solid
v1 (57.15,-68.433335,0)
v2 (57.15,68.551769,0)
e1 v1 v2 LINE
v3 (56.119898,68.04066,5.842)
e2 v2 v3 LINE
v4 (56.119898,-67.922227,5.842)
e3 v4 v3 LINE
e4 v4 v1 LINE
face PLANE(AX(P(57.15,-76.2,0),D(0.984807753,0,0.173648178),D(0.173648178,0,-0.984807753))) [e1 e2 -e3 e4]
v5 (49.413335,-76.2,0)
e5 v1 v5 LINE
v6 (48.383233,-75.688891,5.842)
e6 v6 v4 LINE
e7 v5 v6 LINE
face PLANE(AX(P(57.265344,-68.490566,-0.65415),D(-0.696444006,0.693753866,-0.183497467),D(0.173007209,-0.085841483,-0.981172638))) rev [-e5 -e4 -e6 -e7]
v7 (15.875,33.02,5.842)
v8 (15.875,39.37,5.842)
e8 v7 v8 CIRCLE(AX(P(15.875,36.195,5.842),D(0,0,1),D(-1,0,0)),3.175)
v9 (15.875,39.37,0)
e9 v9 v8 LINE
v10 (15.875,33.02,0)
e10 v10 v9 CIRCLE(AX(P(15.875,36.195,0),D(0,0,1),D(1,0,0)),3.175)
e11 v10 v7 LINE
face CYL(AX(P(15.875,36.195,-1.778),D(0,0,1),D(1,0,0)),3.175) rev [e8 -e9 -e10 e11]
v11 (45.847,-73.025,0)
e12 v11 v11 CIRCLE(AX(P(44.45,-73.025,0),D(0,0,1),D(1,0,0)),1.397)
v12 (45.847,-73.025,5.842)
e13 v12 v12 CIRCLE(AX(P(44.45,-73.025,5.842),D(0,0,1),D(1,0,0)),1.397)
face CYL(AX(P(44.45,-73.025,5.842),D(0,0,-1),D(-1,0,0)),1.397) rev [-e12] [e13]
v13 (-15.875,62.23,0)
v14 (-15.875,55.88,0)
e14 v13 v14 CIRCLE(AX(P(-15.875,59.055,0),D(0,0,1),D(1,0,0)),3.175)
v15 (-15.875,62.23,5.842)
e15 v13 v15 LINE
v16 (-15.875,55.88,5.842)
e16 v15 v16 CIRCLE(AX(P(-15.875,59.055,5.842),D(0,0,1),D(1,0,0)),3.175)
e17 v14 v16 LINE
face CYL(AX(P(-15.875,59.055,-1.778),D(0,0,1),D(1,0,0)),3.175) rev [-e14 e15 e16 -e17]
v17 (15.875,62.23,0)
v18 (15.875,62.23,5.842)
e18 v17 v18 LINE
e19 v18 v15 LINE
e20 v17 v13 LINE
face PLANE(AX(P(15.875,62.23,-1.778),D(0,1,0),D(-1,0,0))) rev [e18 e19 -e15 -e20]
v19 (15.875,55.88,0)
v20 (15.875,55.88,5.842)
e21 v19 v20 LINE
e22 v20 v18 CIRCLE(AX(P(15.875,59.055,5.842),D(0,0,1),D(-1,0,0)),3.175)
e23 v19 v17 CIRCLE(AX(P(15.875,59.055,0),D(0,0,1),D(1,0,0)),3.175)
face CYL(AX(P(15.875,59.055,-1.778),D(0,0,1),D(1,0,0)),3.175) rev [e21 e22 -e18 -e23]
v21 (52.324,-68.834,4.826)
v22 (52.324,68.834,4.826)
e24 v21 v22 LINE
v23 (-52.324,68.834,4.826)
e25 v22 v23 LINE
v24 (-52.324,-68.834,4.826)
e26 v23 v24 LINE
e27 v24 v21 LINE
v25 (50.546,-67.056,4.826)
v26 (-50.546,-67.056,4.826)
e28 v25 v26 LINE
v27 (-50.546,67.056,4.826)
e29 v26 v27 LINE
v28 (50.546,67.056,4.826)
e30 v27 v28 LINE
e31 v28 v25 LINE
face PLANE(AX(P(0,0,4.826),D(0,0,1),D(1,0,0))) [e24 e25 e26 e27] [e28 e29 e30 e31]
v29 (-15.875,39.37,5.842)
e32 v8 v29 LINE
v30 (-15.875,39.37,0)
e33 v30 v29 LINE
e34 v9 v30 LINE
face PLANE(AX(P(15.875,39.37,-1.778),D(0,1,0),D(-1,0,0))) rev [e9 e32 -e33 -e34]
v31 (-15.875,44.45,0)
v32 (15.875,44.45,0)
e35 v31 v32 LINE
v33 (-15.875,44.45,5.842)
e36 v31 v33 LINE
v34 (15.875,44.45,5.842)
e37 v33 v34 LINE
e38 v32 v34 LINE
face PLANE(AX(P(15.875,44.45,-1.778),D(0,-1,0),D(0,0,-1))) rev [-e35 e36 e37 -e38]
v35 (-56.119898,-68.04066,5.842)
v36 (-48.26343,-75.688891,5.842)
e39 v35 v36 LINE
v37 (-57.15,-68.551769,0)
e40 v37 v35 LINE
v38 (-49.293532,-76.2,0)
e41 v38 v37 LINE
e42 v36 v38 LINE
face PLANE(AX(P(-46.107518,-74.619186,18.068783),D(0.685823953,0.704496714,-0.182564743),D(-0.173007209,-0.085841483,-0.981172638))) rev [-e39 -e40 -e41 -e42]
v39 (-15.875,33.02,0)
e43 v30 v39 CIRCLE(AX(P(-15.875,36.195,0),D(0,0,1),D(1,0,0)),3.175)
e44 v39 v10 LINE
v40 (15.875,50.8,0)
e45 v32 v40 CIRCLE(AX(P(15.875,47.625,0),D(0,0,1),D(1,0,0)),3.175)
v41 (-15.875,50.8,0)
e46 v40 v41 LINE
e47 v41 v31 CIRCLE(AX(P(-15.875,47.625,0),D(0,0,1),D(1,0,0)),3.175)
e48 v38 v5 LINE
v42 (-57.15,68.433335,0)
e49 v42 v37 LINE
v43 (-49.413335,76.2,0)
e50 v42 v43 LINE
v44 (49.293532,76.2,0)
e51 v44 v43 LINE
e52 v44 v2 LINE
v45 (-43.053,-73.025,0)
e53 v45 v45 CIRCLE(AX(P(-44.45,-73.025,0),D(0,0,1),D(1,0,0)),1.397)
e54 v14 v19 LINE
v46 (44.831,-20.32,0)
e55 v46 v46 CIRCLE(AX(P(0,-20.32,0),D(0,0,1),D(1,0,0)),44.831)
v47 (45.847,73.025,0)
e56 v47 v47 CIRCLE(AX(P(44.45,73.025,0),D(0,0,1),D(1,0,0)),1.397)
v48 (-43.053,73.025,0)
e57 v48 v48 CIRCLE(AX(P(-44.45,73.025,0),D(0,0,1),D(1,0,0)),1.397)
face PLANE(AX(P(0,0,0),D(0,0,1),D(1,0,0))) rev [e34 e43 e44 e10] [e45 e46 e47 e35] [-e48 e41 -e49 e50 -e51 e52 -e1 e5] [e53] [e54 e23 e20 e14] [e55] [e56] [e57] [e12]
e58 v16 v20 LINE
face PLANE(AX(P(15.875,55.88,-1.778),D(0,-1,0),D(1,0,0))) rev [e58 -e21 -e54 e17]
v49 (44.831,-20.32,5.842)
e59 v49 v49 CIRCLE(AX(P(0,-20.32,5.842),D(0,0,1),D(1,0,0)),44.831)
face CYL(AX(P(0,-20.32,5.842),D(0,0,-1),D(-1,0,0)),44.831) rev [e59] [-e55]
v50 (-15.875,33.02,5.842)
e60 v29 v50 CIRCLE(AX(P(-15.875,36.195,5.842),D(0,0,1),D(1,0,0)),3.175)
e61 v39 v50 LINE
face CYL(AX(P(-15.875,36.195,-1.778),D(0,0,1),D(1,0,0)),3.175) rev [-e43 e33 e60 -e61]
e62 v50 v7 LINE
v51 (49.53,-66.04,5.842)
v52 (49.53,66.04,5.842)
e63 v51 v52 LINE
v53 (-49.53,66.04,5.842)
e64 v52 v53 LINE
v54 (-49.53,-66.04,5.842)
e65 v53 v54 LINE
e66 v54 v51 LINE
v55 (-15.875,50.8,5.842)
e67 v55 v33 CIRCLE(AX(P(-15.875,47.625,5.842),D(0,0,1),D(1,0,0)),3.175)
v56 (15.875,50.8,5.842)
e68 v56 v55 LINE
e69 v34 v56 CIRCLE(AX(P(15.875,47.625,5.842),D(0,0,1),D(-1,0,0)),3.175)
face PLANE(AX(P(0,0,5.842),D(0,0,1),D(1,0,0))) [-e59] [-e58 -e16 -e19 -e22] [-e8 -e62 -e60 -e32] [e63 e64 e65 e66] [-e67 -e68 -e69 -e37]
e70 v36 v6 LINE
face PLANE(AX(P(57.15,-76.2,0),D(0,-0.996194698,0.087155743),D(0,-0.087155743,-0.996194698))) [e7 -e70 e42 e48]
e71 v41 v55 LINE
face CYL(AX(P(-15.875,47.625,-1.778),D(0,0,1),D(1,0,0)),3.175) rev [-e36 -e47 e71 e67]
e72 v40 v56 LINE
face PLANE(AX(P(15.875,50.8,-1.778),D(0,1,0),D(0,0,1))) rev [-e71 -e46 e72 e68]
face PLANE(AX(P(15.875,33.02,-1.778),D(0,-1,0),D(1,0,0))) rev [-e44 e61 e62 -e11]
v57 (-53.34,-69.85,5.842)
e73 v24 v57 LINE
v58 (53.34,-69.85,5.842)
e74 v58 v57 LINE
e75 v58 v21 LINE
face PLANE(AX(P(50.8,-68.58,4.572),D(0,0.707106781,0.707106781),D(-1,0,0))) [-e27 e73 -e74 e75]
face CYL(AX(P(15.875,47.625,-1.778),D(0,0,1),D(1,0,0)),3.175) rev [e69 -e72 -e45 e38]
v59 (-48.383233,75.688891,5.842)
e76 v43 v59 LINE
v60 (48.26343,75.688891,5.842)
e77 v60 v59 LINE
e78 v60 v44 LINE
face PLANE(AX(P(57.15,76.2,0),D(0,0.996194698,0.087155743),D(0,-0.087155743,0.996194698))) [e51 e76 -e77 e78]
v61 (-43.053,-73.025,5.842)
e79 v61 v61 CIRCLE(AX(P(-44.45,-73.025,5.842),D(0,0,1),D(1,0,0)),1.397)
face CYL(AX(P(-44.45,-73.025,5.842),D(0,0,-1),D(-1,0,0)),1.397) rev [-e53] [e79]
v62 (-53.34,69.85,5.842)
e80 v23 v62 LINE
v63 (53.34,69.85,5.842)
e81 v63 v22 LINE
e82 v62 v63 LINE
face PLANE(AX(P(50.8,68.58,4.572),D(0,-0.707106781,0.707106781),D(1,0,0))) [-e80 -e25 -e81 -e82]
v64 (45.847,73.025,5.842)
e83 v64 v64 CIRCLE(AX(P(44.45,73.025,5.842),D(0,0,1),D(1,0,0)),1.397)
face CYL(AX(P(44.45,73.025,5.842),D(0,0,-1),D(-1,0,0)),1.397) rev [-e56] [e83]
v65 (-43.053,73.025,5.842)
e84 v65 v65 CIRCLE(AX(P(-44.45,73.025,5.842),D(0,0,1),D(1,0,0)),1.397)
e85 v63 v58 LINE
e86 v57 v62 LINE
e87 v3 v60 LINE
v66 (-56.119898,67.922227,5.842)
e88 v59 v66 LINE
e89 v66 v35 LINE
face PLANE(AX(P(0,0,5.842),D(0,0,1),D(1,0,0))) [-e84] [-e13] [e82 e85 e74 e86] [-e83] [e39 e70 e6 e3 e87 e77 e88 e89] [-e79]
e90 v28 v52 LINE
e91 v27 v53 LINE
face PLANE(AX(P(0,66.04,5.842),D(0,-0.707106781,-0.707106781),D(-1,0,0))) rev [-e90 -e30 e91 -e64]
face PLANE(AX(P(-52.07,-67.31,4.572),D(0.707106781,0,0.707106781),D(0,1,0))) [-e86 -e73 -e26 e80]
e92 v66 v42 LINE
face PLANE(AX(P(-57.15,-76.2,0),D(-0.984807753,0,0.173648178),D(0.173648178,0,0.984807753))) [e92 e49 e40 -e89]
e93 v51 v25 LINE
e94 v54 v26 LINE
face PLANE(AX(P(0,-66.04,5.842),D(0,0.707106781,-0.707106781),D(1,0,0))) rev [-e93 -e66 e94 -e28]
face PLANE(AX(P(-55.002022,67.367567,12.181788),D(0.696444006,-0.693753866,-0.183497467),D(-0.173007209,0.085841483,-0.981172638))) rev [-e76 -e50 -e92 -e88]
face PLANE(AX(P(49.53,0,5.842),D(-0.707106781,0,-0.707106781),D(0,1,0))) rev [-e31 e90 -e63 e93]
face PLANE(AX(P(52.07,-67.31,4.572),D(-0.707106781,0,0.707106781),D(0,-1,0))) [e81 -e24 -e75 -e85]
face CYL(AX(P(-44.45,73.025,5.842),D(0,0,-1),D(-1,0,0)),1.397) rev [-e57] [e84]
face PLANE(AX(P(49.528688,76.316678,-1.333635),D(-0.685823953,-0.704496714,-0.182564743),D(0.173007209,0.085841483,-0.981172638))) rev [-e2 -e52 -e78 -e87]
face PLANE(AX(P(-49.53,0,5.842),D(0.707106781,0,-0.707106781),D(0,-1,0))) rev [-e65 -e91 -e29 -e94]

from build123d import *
from OCP.BRepFilletAPI import BRepFilletAPI_MakeChamfer

# Parameters (mm, degrees)
SKETCH1_W               = 114.3
SKETCH1_H               = 152.4
SKETCH1_R               = 44.831
SKETCH1_R_2             = 1.397
BOSS_EXTRUDE1_DEPTH     = 5.842
DRAFT1_ANGLE            = -5
DRAFT2_ANGLE            = -10
SKETCH2_W               = 104.14
SKETCH2_H               = 137.16
SKETCH2_W_2             = 101.6
SKETCH2_H_2             = 134.62
CUT_EXTRUDE_THIN1_DEPTH = 1.016
CHAMFER2_SIZE           = 7.62
CHAMFER2_SIZE2          = 7.737996461
CUT_EXTRUDE1_DEPTH      = 7.62


with BuildPart() as part:
    # Sketch1 → Boss-Extrude1 (new body)
    with BuildSketch(Plane.XY):
        Rectangle(SKETCH1_W, SKETCH1_H)
        with Locations((0, -20.32)):
            Circle(SKETCH1_R, mode=Mode.SUBTRACT)
        with Locations((-44.45, 73.025)):
            Circle(SKETCH1_R_2, mode=Mode.SUBTRACT)
        with Locations((44.45, 73.025)):
            Circle(SKETCH1_R_2, mode=Mode.SUBTRACT)
        with Locations((44.45, -73.025)):
            Circle(SKETCH1_R_2, mode=Mode.SUBTRACT)
        with Locations((-44.45, -73.025)):
            Circle(SKETCH1_R_2, mode=Mode.SUBTRACT)
    extrude(amount=BOSS_EXTRUDE1_DEPTH)

    # Draft1
    draft1_faces = [part.faces().sort_by_distance(p)[0] for p in [
        (0, 76.2, 2.921),
        (0, -76.2, 2.921),
    ]]
    draft(draft1_faces, Plane(origin=(0, 0, 0), x_dir=(-1, 0, 0), z_dir=(0, 0, -1)), DRAFT1_ANGLE)

    # Draft2
    draft2_faces = [part.faces().sort_by_distance(p)[0] for p in [
        (57.15, 0, 2.917723595),
        (-57.15, 0, 2.917723595),
    ]]
    draft(draft2_faces, Plane(origin=(0, 0, 0), x_dir=(-1, 0, 0), z_dir=(0, 0, -1)), DRAFT2_ANGLE)

    # Sketch2 → Cut-Extrude-Thin1 (cut)
    with BuildSketch(Plane.XY.offset(5.842)):
        Rectangle(SKETCH2_W, SKETCH2_H)
        Rectangle(SKETCH2_W_2, SKETCH2_H_2, mode=Mode.SUBTRACT)
    extrude(amount=-CUT_EXTRUDE_THIN1_DEPTH, mode=Mode.SUBTRACT)

    # Chamfer1
    # the kernel refuses this chamfer: 1.27 mm, written as the material it takes off along each edge
    with BuildSketch(Plane(origin=(50.8, 67.31, 5.842), x_dir=(-0.9996219169112968, 0, 0.02749587661058659), z_dir=(0, -1, 0))) as chamfer1_piece_1_section:
        with BuildLine():
            Line((1.306414958, 0), (-0.071814887, 1.304439598))
            Line((-0.071814887, 1.304439598), (-0.097205283, 1.303741203))
            ThreePointArc((-0.097205283, 1.303741203), (-0.043344118, 0.652015244), (-0.025390397, -0.000698395))
            Line((-0.025390397, -0.000698395), (0.000698395, -0.025390397))
            ThreePointArc((0.000698395, -0.025390397), (0.653412034, -0.007436675), (1.307113353, -0.025390397))
            Line((1.307113353, -0.025390397), (1.306414958, 0))
        make_face()
    chamfer1_piece_1 = extrude(amount=134.62, mode=Mode.PRIVATE)
    chamfer1_piece_1 = split(chamfer1_piece_1, bisect_by=Plane(origin=(50.360937616, 0, 4.826), z_dir=(0, 0, 1)), keep=Keep.TOP, mode=Mode.PRIVATE)
    add(chamfer1_piece_1, mode=Mode.SUBTRACT)
    with BuildSketch(Plane(origin=(50.8, -67.31, 5.842), x_dir=(0, 0.9996219169112968, 0.02749587661058659), z_dir=(-1, 0, 0))) as chamfer1_piece_2_section:
        with BuildLine():
            Line((1.306414958, 0), (-0.071814887, 1.304439598))
            Line((-0.071814887, 1.304439598), (-0.097205283, 1.303741203))
            ThreePointArc((-0.097205283, 1.303741203), (-0.043344118, 0.652015244), (-0.025390397, -0.000698395))
            Line((-0.025390397, -0.000698395), (0.000698395, -0.025390397))
            ThreePointArc((0.000698395, -0.025390397), (0.653412034, -0.007436675), (1.307113353, -0.025390397))
            Line((1.307113353, -0.025390397), (1.306414958, 0))
        make_face()
    chamfer1_piece_2 = extrude(amount=101.6, mode=Mode.PRIVATE)
    chamfer1_piece_2 = split(chamfer1_piece_2, bisect_by=Plane(origin=(0, -66.870937616, 4.826), z_dir=(0, 0, 1)), keep=Keep.TOP, mode=Mode.PRIVATE)
    add(chamfer1_piece_2, mode=Mode.SUBTRACT)
    with BuildSketch(Plane(origin=(-50.8, -67.31, 5.842), x_dir=(0.9996219169112968, 0, 0.02749587661058659), z_dir=(0, 1, 0))) as chamfer1_piece_3_section:
        with BuildLine():
            Line((1.306414958, 0), (-0.071814887, 1.304439598))
            Line((-0.071814887, 1.304439598), (-0.097205283, 1.303741203))
            ThreePointArc((-0.097205283, 1.303741203), (-0.043344118, 0.652015244), (-0.025390397, -0.000698395))
            Line((-0.025390397, -0.000698395), (0.000698395, -0.025390397))
            ThreePointArc((0.000698395, -0.025390397), (0.653412034, -0.007436675), (1.307113353, -0.025390397))
            Line((1.307113353, -0.025390397), (1.306414958, 0))
        make_face()
    chamfer1_piece_3 = extrude(amount=134.62, mode=Mode.PRIVATE)
    chamfer1_piece_3 = split(chamfer1_piece_3, bisect_by=Plane(origin=(-50.360937616, 0, 4.826), z_dir=(0, 0, 1)), keep=Keep.TOP, mode=Mode.PRIVATE)
    add(chamfer1_piece_3, mode=Mode.SUBTRACT)
    with BuildSketch(Plane(origin=(-50.8, 67.31, 5.842), x_dir=(0, -0.9996219169112968, 0.02749587661058659), z_dir=(1, 0, 0))) as chamfer1_piece_4_section:
        with BuildLine():
            Line((1.306414958, 0), (-0.071814887, 1.304439598))
            Line((-0.071814887, 1.304439598), (-0.097205283, 1.303741203))
            ThreePointArc((-0.097205283, 1.303741203), (-0.043344118, 0.652015244), (-0.025390397, -0.000698395))
            Line((-0.025390397, -0.000698395), (0.000698395, -0.025390397))
            ThreePointArc((0.000698395, -0.025390397), (0.653412034, -0.007436675), (1.307113353, -0.025390397))
            Line((1.307113353, -0.025390397), (1.306414958, 0))
        make_face()
    chamfer1_piece_4 = extrude(amount=101.6, mode=Mode.PRIVATE)
    chamfer1_piece_4 = split(chamfer1_piece_4, bisect_by=Plane(origin=(0, 66.870937616, 4.826), z_dir=(0, 0, 1)), keep=Keep.TOP, mode=Mode.PRIVATE)
    add(chamfer1_piece_4, mode=Mode.SUBTRACT)
    with BuildSketch(Plane(origin=(-52.07, 68.58, 5.842), x_dir=(0, 0.9996219169112968, 0.02749587661058659), z_dir=(1, 0, 0))) as chamfer1_piece_5_section:
        with BuildLine():
            Line((1.306414958, 0), (-0.071814887, -1.304439598))
            Line((-0.071814887, -1.304439598), (-0.097205283, -1.303741203))
            ThreePointArc((-0.097205283, -1.303741203), (-0.043344118, -0.652015244), (-0.025390397, 0.000698395))
            Line((-0.025390397, 0.000698395), (0.000698395, 0.025390397))
            ThreePointArc((0.000698395, 0.025390397), (0.653412034, 0.007436675), (1.307113353, 0.025390397))
            Line((1.307113353, 0.025390397), (1.306414958, 0))
        make_face()
    chamfer1_piece_5 = extrude(amount=104.14, mode=Mode.PRIVATE)
    chamfer1_piece_5 = split(chamfer1_piece_5, bisect_by=Plane(origin=(0, 69.019062384, 4.826), z_dir=(0, 0, 1)), keep=Keep.TOP, mode=Mode.PRIVATE)
    add(chamfer1_piece_5, mode=Mode.SUBTRACT)
    with BuildSketch(Plane(origin=(52.07, 68.58, 5.842), x_dir=(0.9996219169112968, 0, 0.02749587661058659), z_dir=(0, -1, 0))) as chamfer1_piece_6_section:
        with BuildLine():
            Line((1.306414958, 0), (-0.071814887, -1.304439598))
            Line((-0.071814887, -1.304439598), (-0.097205283, -1.303741203))
            ThreePointArc((-0.097205283, -1.303741203), (-0.043344118, -0.652015244), (-0.025390397, 0.000698395))
            Line((-0.025390397, 0.000698395), (0.000698395, 0.025390397))
            ThreePointArc((0.000698395, 0.025390397), (0.653412034, 0.007436675), (1.307113353, 0.025390397))
            Line((1.307113353, 0.025390397), (1.306414958, 0))
        make_face()
    chamfer1_piece_6 = extrude(amount=137.16, mode=Mode.PRIVATE)
    chamfer1_piece_6 = split(chamfer1_piece_6, bisect_by=Plane(origin=(52.509062384, 0, 4.826), z_dir=(0, 0, 1)), keep=Keep.TOP, mode=Mode.PRIVATE)
    add(chamfer1_piece_6, mode=Mode.SUBTRACT)
    with BuildSketch(Plane(origin=(-52.07, -68.58, 5.842), x_dir=(-0.9996219169112968, 0, 0.02749587661058659), z_dir=(0, 1, 0))) as chamfer1_piece_7_section:
        with BuildLine():
            Line((1.306414958, 0), (-0.071814887, -1.304439598))
            Line((-0.071814887, -1.304439598), (-0.097205283, -1.303741203))
            ThreePointArc((-0.097205283, -1.303741203), (-0.043344118, -0.652015244), (-0.025390397, 0.000698395))
            Line((-0.025390397, 0.000698395), (0.000698395, 0.025390397))
            ThreePointArc((0.000698395, 0.025390397), (0.653412034, 0.007436675), (1.307113353, 0.025390397))
            Line((1.307113353, 0.025390397), (1.306414958, 0))
        make_face()
    chamfer1_piece_7 = extrude(amount=137.16, mode=Mode.PRIVATE)
    chamfer1_piece_7 = split(chamfer1_piece_7, bisect_by=Plane(origin=(-52.509062384, 0, 4.826), z_dir=(0, 0, 1)), keep=Keep.TOP, mode=Mode.PRIVATE)
    add(chamfer1_piece_7, mode=Mode.SUBTRACT)
    with BuildSketch(Plane(origin=(52.07, -68.58, 5.842), x_dir=(0, -0.9996219169112968, 0.02749587661058659), z_dir=(-1, 0, 0))) as chamfer1_piece_8_section:
        with BuildLine():
            Line((1.306414958, 0), (-0.071814887, -1.304439598))
            Line((-0.071814887, -1.304439598), (-0.097205283, -1.303741203))
            ThreePointArc((-0.097205283, -1.303741203), (-0.043344118, -0.652015244), (-0.025390397, 0.000698395))
            Line((-0.025390397, 0.000698395), (0.000698395, 0.025390397))
            ThreePointArc((0.000698395, 0.025390397), (0.653412034, 0.007436675), (1.307113353, 0.025390397))
            Line((1.307113353, 0.025390397), (1.306414958, 0))
        make_face()
    chamfer1_piece_8 = extrude(amount=104.14, mode=Mode.PRIVATE)
    chamfer1_piece_8 = split(chamfer1_piece_8, bisect_by=Plane(origin=(0, -69.019062384, 4.826), z_dir=(0, 0, 1)), keep=Keep.TOP, mode=Mode.PRIVATE)
    add(chamfer1_piece_8, mode=Mode.SUBTRACT)
    with BuildSketch(Plane(origin=(50.8, 70.576037395, 5.842), x_dir=(-0.9996219169112968, 0, 0.02749587661058659), z_dir=(0, -1, 0))) as chamfer1_piece_9a_section:
        with BuildLine():
            Line((1.306414958, 0), (-0.071814887, 1.304439598))
            Line((-0.071814887, 1.304439598), (-0.097205283, 1.303741203))
            ThreePointArc((-0.097205283, 1.303741203), (-0.043344118, 0.652015244), (-0.025390397, -0.000698395))
            Line((-0.025390397, -0.000698395), (0.000698395, -0.025390397))
            ThreePointArc((0.000698395, -0.025390397), (0.653412034, -0.007436675), (1.307113353, -0.025390397))
            Line((1.307113353, -0.025390397), (1.306414958, 0))
        make_face()
    chamfer1_piece_9a = extrude(amount=137.886037395, mode=Mode.PRIVATE)
    chamfer1_piece_9a = split(chamfer1_piece_9a, bisect_by=Plane(origin=(50.360937616, 68.943018697, 4.826), z_dir=(0, 0, 1)), keep=Keep.TOP, mode=Mode.PRIVATE)
    chamfer1_piece_9a = split(chamfer1_piece_9a, bisect_by=Plane(origin=(50.360937616, 67.31, 5.461731684), z_dir=(0, 1, 0)), keep=Keep.TOP, mode=Mode.PRIVATE)
    with BuildSketch(Plane(origin=(-50.8, 67.31, 5.842), x_dir=(0, -0.9996219169112968, 0.02749587661058659), z_dir=(1, 0, 0))) as chamfer1_piece_9b_section:
        with BuildLine():
            Line((1.306414958, 0), (-0.071814887, 1.304439598))
            Line((-0.071814887, 1.304439598), (-0.097205283, 1.303741203))
            ThreePointArc((-0.097205283, 1.303741203), (-0.043344118, 0.652015244), (-0.025390397, -0.000698395))
            Line((-0.025390397, -0.000698395), (0.000698395, -0.025390397))
            ThreePointArc((0.000698395, -0.025390397), (0.653412034, -0.007436675), (1.307113353, -0.025390397))
            Line((1.307113353, -0.025390397), (1.306414958, 0))
        make_face()
    chamfer1_piece_9b = extrude(amount=104.866037395, mode=Mode.PRIVATE)
    chamfer1_piece_9b = split(chamfer1_piece_9b, bisect_by=Plane(origin=(52.433018697, 66.870937616, 4.826), z_dir=(0, 0, 1)), keep=Keep.TOP, mode=Mode.PRIVATE)
    chamfer1_piece_9b = split(chamfer1_piece_9b, bisect_by=Plane(origin=(50.8, 66.870937616, 5.461731684), z_dir=(1, 0, 0)), keep=Keep.TOP, mode=Mode.PRIVATE)
    chamfer1_piece_9 = chamfer1_piece_9a & chamfer1_piece_9b
    add(chamfer1_piece_9, mode=Mode.SUBTRACT)
    with BuildSketch(Plane(origin=(54.066037395, -67.31, 5.842), x_dir=(0, 0.9996219169112968, 0.02749587661058659), z_dir=(-1, 0, 0))) as chamfer1_piece_10a_section:
        with BuildLine():
            Line((1.306414958, 0), (-0.071814887, 1.304439598))
            Line((-0.071814887, 1.304439598), (-0.097205283, 1.303741203))
            ThreePointArc((-0.097205283, 1.303741203), (-0.043344118, 0.652015244), (-0.025390397, -0.000698395))
            Line((-0.025390397, -0.000698395), (0.000698395, -0.025390397))
            ThreePointArc((0.000698395, -0.025390397), (0.653412034, -0.007436675), (1.307113353, -0.025390397))
            Line((1.307113353, -0.025390397), (1.306414958, 0))
        make_face()
    chamfer1_piece_10a = extrude(amount=104.866037395, mode=Mode.PRIVATE)
    chamfer1_piece_10a = split(chamfer1_piece_10a, bisect_by=Plane(origin=(52.433018697, -66.870937616, 4.826), z_dir=(0, 0, 1)), keep=Keep.TOP, mode=Mode.PRIVATE)
    chamfer1_piece_10a = split(chamfer1_piece_10a, bisect_by=Plane(origin=(50.8, -66.870937616, 5.461731684), z_dir=(1, 0, 0)), keep=Keep.TOP, mode=Mode.PRIVATE)
    with BuildSketch(Plane(origin=(50.8, 67.31, 5.842), x_dir=(-0.9996219169112968, 0, 0.02749587661058659), z_dir=(0, -1, 0))) as chamfer1_piece_10b_section:
        with BuildLine():
            Line((1.306414958, 0), (-0.071814887, 1.304439598))
            Line((-0.071814887, 1.304439598), (-0.097205283, 1.303741203))
            ThreePointArc((-0.097205283, 1.303741203), (-0.043344118, 0.652015244), (-0.025390397, -0.000698395))
            Line((-0.025390397, -0.000698395), (0.000698395, -0.025390397))
            ThreePointArc((0.000698395, -0.025390397), (0.653412034, -0.007436675), (1.307113353, -0.025390397))
            Line((1.307113353, -0.025390397), (1.306414958, 0))
        make_face()
    chamfer1_piece_10b = extrude(amount=137.886037395, mode=Mode.PRIVATE)
    chamfer1_piece_10b = split(chamfer1_piece_10b, bisect_by=Plane(origin=(50.360937616, -68.943018697, 4.826), z_dir=(0, 0, 1)), keep=Keep.TOP, mode=Mode.PRIVATE)
    chamfer1_piece_10b = split(chamfer1_piece_10b, bisect_by=Plane(origin=(50.360937616, -67.31, 5.461731684), z_dir=(0, -1, 0)), keep=Keep.TOP, mode=Mode.PRIVATE)
    chamfer1_piece_10 = chamfer1_piece_10a & chamfer1_piece_10b
    add(chamfer1_piece_10, mode=Mode.SUBTRACT)
    with BuildSketch(Plane(origin=(50.8, -67.31, 5.842), x_dir=(0, 0.9996219169112968, 0.02749587661058659), z_dir=(-1, 0, 0))) as chamfer1_piece_11a_section:
        with BuildLine():
            Line((1.306414958, 0), (-0.071814887, 1.304439598))
            Line((-0.071814887, 1.304439598), (-0.097205283, 1.303741203))
            ThreePointArc((-0.097205283, 1.303741203), (-0.043344118, 0.652015244), (-0.025390397, -0.000698395))
            Line((-0.025390397, -0.000698395), (0.000698395, -0.025390397))
            ThreePointArc((0.000698395, -0.025390397), (0.653412034, -0.007436675), (1.307113353, -0.025390397))
            Line((1.307113353, -0.025390397), (1.306414958, 0))
        make_face()
    chamfer1_piece_11a = extrude(amount=104.866037395, mode=Mode.PRIVATE)
    chamfer1_piece_11a = split(chamfer1_piece_11a, bisect_by=Plane(origin=(-52.433018697, -66.870937616, 4.826), z_dir=(0, 0, 1)), keep=Keep.TOP, mode=Mode.PRIVATE)
    chamfer1_piece_11a = split(chamfer1_piece_11a, bisect_by=Plane(origin=(-50.8, -66.870937616, 5.461731684), z_dir=(-1, 0, 0)), keep=Keep.TOP, mode=Mode.PRIVATE)
    with BuildSketch(Plane(origin=(-50.8, -70.576037395, 5.842), x_dir=(0.9996219169112968, 0, 0.02749587661058659), z_dir=(0, 1, 0))) as chamfer1_piece_11b_section:
        with BuildLine():
            Line((1.306414958, 0), (-0.071814887, 1.304439598))
            Line((-0.071814887, 1.304439598), (-0.097205283, 1.303741203))
            ThreePointArc((-0.097205283, 1.303741203), (-0.043344118, 0.652015244), (-0.025390397, -0.000698395))
            Line((-0.025390397, -0.000698395), (0.000698395, -0.025390397))
            ThreePointArc((0.000698395, -0.025390397), (0.653412034, -0.007436675), (1.307113353, -0.025390397))
            Line((1.307113353, -0.025390397), (1.306414958, 0))
        make_face()
    chamfer1_piece_11b = extrude(amount=137.886037395, mode=Mode.PRIVATE)
    chamfer1_piece_11b = split(chamfer1_piece_11b, bisect_by=Plane(origin=(-50.360937616, -68.943018697, 4.826), z_dir=(0, 0, 1)), keep=Keep.TOP, mode=Mode.PRIVATE)
    chamfer1_piece_11b = split(chamfer1_piece_11b, bisect_by=Plane(origin=(-50.360937616, -67.31, 5.461731684), z_dir=(0, -1, 0)), keep=Keep.TOP, mode=Mode.PRIVATE)
    chamfer1_piece_11 = chamfer1_piece_11a & chamfer1_piece_11b
    add(chamfer1_piece_11, mode=Mode.SUBTRACT)
    with BuildSketch(Plane(origin=(-54.066037395, 67.31, 5.842), x_dir=(0, -0.9996219169112968, 0.02749587661058659), z_dir=(1, 0, 0))) as chamfer1_piece_12a_section:
        with BuildLine():
            Line((1.306414958, 0), (-0.071814887, 1.304439598))
            Line((-0.071814887, 1.304439598), (-0.097205283, 1.303741203))
            ThreePointArc((-0.097205283, 1.303741203), (-0.043344118, 0.652015244), (-0.025390397, -0.000698395))
            Line((-0.025390397, -0.000698395), (0.000698395, -0.025390397))
            ThreePointArc((0.000698395, -0.025390397), (0.653412034, -0.007436675), (1.307113353, -0.025390397))
            Line((1.307113353, -0.025390397), (1.306414958, 0))
        make_face()
    chamfer1_piece_12a = extrude(amount=104.866037395, mode=Mode.PRIVATE)
    chamfer1_piece_12a = split(chamfer1_piece_12a, bisect_by=Plane(origin=(-52.433018697, 66.870937616, 4.826), z_dir=(0, 0, 1)), keep=Keep.TOP, mode=Mode.PRIVATE)
    chamfer1_piece_12a = split(chamfer1_piece_12a, bisect_by=Plane(origin=(-50.8, 66.870937616, 5.461731684), z_dir=(-1, 0, 0)), keep=Keep.TOP, mode=Mode.PRIVATE)
    with BuildSketch(Plane(origin=(-50.8, -67.31, 5.842), x_dir=(0.9996219169112968, 0, 0.02749587661058659), z_dir=(0, 1, 0))) as chamfer1_piece_12b_section:
        with BuildLine():
            Line((1.306414958, 0), (-0.071814887, 1.304439598))
            Line((-0.071814887, 1.304439598), (-0.097205283, 1.303741203))
            ThreePointArc((-0.097205283, 1.303741203), (-0.043344118, 0.652015244), (-0.025390397, -0.000698395))
            Line((-0.025390397, -0.000698395), (0.000698395, -0.025390397))
            ThreePointArc((0.000698395, -0.025390397), (0.653412034, -0.007436675), (1.307113353, -0.025390397))
            Line((1.307113353, -0.025390397), (1.306414958, 0))
        make_face()
    chamfer1_piece_12b = extrude(amount=137.886037395, mode=Mode.PRIVATE)
    chamfer1_piece_12b = split(chamfer1_piece_12b, bisect_by=Plane(origin=(-50.360937616, 68.943018697, 4.826), z_dir=(0, 0, 1)), keep=Keep.TOP, mode=Mode.PRIVATE)
    chamfer1_piece_12b = split(chamfer1_piece_12b, bisect_by=Plane(origin=(-50.360937616, 67.31, 5.461731684), z_dir=(0, 1, 0)), keep=Keep.TOP, mode=Mode.PRIVATE)
    chamfer1_piece_12 = chamfer1_piece_12a & chamfer1_piece_12b
    add(chamfer1_piece_12, mode=Mode.SUBTRACT)
    with BuildSketch(Plane(origin=(-55.336037395, 68.58, 5.842), x_dir=(0, 0.9996219169112968, 0.02749587661058659), z_dir=(1, 0, 0))) as chamfer1_piece_13a_section:
        with BuildLine():
            Line((1.306414958, 0), (-0.071814887, -1.304439598))
            Line((-0.071814887, -1.304439598), (-0.097205283, -1.303741203))
            ThreePointArc((-0.097205283, -1.303741203), (-0.043344118, -0.652015244), (-0.025390397, 0.000698395))
            Line((-0.025390397, 0.000698395), (0.000698395, 0.025390397))
            ThreePointArc((0.000698395, 0.025390397), (0.653412034, 0.007436675), (1.307113353, 0.025390397))
            Line((1.307113353, 0.025390397), (1.306414958, 0))
        make_face()
    chamfer1_piece_13a = extrude(amount=107.406037395, mode=Mode.PRIVATE)
    chamfer1_piece_13a = split(chamfer1_piece_13a, bisect_by=Plane(origin=(-52.07, 69.019062384, 5.461731684), z_dir=(-1, 0, 0)), keep=Keep.TOP, mode=Mode.PRIVATE)
    chamfer1_piece_13a = split(chamfer1_piece_13a, bisect_by=Plane(origin=(-53.703018697, 69.019062384, 4.826), z_dir=(0, 0, 1)), keep=Keep.TOP, mode=Mode.PRIVATE)
    with BuildSketch(Plane(origin=(-52.07, -68.58, 5.842), x_dir=(-0.9996219169112968, 0, 0.02749587661058659), z_dir=(0, 1, 0))) as chamfer1_piece_13b_section:
        with BuildLine():
            Line((1.306414958, 0), (-0.071814887, -1.304439598))
            Line((-0.071814887, -1.304439598), (-0.097205283, -1.303741203))
            ThreePointArc((-0.097205283, -1.303741203), (-0.043344118, -0.652015244), (-0.025390397, 0.000698395))
            Line((-0.025390397, 0.000698395), (0.000698395, 0.025390397))
            ThreePointArc((0.000698395, 0.025390397), (0.653412034, 0.007436675), (1.307113353, 0.025390397))
            Line((1.307113353, 0.025390397), (1.306414958, 0))
        make_face()
    chamfer1_piece_13b = extrude(amount=140.426037395, mode=Mode.PRIVATE)
    chamfer1_piece_13b = split(chamfer1_piece_13b, bisect_by=Plane(origin=(-52.509062384, 68.58, 5.461731684), z_dir=(0, 1, 0)), keep=Keep.TOP, mode=Mode.PRIVATE)
    chamfer1_piece_13b = split(chamfer1_piece_13b, bisect_by=Plane(origin=(-52.509062384, 70.213018697, 4.826), z_dir=(0, 0, 1)), keep=Keep.TOP, mode=Mode.PRIVATE)
    chamfer1_piece_13 = chamfer1_piece_13a & chamfer1_piece_13b
    add(chamfer1_piece_13, mode=Mode.SUBTRACT)
    with BuildSketch(Plane(origin=(-52.07, 68.58, 5.842), x_dir=(0, 0.9996219169112968, 0.02749587661058659), z_dir=(1, 0, 0))) as chamfer1_piece_14a_section:
        with BuildLine():
            Line((1.306414958, 0), (-0.071814887, -1.304439598))
            Line((-0.071814887, -1.304439598), (-0.097205283, -1.303741203))
            ThreePointArc((-0.097205283, -1.303741203), (-0.043344118, -0.652015244), (-0.025390397, 0.000698395))
            Line((-0.025390397, 0.000698395), (0.000698395, 0.025390397))
            ThreePointArc((0.000698395, 0.025390397), (0.653412034, 0.007436675), (1.307113353, 0.025390397))
            Line((1.307113353, 0.025390397), (1.306414958, 0))
        make_face()
    chamfer1_piece_14a = extrude(amount=107.406037395, mode=Mode.PRIVATE)
    chamfer1_piece_14a = split(chamfer1_piece_14a, bisect_by=Plane(origin=(52.07, 69.019062384, 5.461731684), z_dir=(1, 0, 0)), keep=Keep.TOP, mode=Mode.PRIVATE)
    chamfer1_piece_14a = split(chamfer1_piece_14a, bisect_by=Plane(origin=(53.703018697, 69.019062384, 4.826), z_dir=(0, 0, 1)), keep=Keep.TOP, mode=Mode.PRIVATE)
    with BuildSketch(Plane(origin=(52.07, 71.846037395, 5.842), x_dir=(0.9996219169112968, 0, 0.02749587661058659), z_dir=(0, -1, 0))) as chamfer1_piece_14b_section:
        with BuildLine():
            Line((1.306414958, 0), (-0.071814887, -1.304439598))
            Line((-0.071814887, -1.304439598), (-0.097205283, -1.303741203))
            ThreePointArc((-0.097205283, -1.303741203), (-0.043344118, -0.652015244), (-0.025390397, 0.000698395))
            Line((-0.025390397, 0.000698395), (0.000698395, 0.025390397))
            ThreePointArc((0.000698395, 0.025390397), (0.653412034, 0.007436675), (1.307113353, 0.025390397))
            Line((1.307113353, 0.025390397), (1.306414958, 0))
        make_face()
    chamfer1_piece_14b = extrude(amount=140.426037395, mode=Mode.PRIVATE)
    chamfer1_piece_14b = split(chamfer1_piece_14b, bisect_by=Plane(origin=(52.509062384, 68.58, 5.461731684), z_dir=(0, 1, 0)), keep=Keep.TOP, mode=Mode.PRIVATE)
    chamfer1_piece_14b = split(chamfer1_piece_14b, bisect_by=Plane(origin=(52.509062384, 70.213018697, 4.826), z_dir=(0, 0, 1)), keep=Keep.TOP, mode=Mode.PRIVATE)
    chamfer1_piece_14 = chamfer1_piece_14a & chamfer1_piece_14b
    add(chamfer1_piece_14, mode=Mode.SUBTRACT)
    with BuildSketch(Plane(origin=(52.07, 68.58, 5.842), x_dir=(0.9996219169112968, 0, 0.02749587661058659), z_dir=(0, -1, 0))) as chamfer1_piece_15a_section:
        with BuildLine():
            Line((1.306414958, 0), (-0.071814887, -1.304439598))
            Line((-0.071814887, -1.304439598), (-0.097205283, -1.303741203))
            ThreePointArc((-0.097205283, -1.303741203), (-0.043344118, -0.652015244), (-0.025390397, 0.000698395))
            Line((-0.025390397, 0.000698395), (0.000698395, 0.025390397))
            ThreePointArc((0.000698395, 0.025390397), (0.653412034, 0.007436675), (1.307113353, 0.025390397))
            Line((1.307113353, 0.025390397), (1.306414958, 0))
        make_face()
    chamfer1_piece_15a = extrude(amount=140.426037395, mode=Mode.PRIVATE)
    chamfer1_piece_15a = split(chamfer1_piece_15a, bisect_by=Plane(origin=(52.509062384, -68.58, 5.461731684), z_dir=(0, -1, 0)), keep=Keep.TOP, mode=Mode.PRIVATE)
    chamfer1_piece_15a = split(chamfer1_piece_15a, bisect_by=Plane(origin=(52.509062384, -70.213018697, 4.826), z_dir=(0, 0, 1)), keep=Keep.TOP, mode=Mode.PRIVATE)
    with BuildSketch(Plane(origin=(55.336037395, -68.58, 5.842), x_dir=(0, -0.9996219169112968, 0.02749587661058659), z_dir=(-1, 0, 0))) as chamfer1_piece_15b_section:
        with BuildLine():
            Line((1.306414958, 0), (-0.071814887, -1.304439598))
            Line((-0.071814887, -1.304439598), (-0.097205283, -1.303741203))
            ThreePointArc((-0.097205283, -1.303741203), (-0.043344118, -0.652015244), (-0.025390397, 0.000698395))
            Line((-0.025390397, 0.000698395), (0.000698395, 0.025390397))
            ThreePointArc((0.000698395, 0.025390397), (0.653412034, 0.007436675), (1.307113353, 0.025390397))
            Line((1.307113353, 0.025390397), (1.306414958, 0))
        make_face()
    chamfer1_piece_15b = extrude(amount=107.406037395, mode=Mode.PRIVATE)
    chamfer1_piece_15b = split(chamfer1_piece_15b, bisect_by=Plane(origin=(52.07, -69.019062384, 5.461731684), z_dir=(1, 0, 0)), keep=Keep.TOP, mode=Mode.PRIVATE)
    chamfer1_piece_15b = split(chamfer1_piece_15b, bisect_by=Plane(origin=(53.703018697, -69.019062384, 4.826), z_dir=(0, 0, 1)), keep=Keep.TOP, mode=Mode.PRIVATE)
    chamfer1_piece_15 = chamfer1_piece_15a & chamfer1_piece_15b
    add(chamfer1_piece_15, mode=Mode.SUBTRACT)
    with BuildSketch(Plane(origin=(52.07, -68.58, 5.842), x_dir=(0, -0.9996219169112968, 0.02749587661058659), z_dir=(-1, 0, 0))) as chamfer1_piece_16a_section:
        with BuildLine():
            Line((1.306414958, 0), (-0.071814887, -1.304439598))
            Line((-0.071814887, -1.304439598), (-0.097205283, -1.303741203))
            ThreePointArc((-0.097205283, -1.303741203), (-0.043344118, -0.652015244), (-0.025390397, 0.000698395))
            Line((-0.025390397, 0.000698395), (0.000698395, 0.025390397))
            ThreePointArc((0.000698395, 0.025390397), (0.653412034, 0.007436675), (1.307113353, 0.025390397))
            Line((1.307113353, 0.025390397), (1.306414958, 0))
        make_face()
    chamfer1_piece_16a = extrude(amount=107.406037395, mode=Mode.PRIVATE)
    chamfer1_piece_16a = split(chamfer1_piece_16a, bisect_by=Plane(origin=(-52.07, -69.019062384, 5.461731684), z_dir=(-1, 0, 0)), keep=Keep.TOP, mode=Mode.PRIVATE)
    chamfer1_piece_16a = split(chamfer1_piece_16a, bisect_by=Plane(origin=(-53.703018697, -69.019062384, 4.826), z_dir=(0, 0, 1)), keep=Keep.TOP, mode=Mode.PRIVATE)
    with BuildSketch(Plane(origin=(-52.07, -71.846037395, 5.842), x_dir=(-0.9996219169112968, 0, 0.02749587661058659), z_dir=(0, 1, 0))) as chamfer1_piece_16b_section:
        with BuildLine():
            Line((1.306414958, 0), (-0.071814887, -1.304439598))
            Line((-0.071814887, -1.304439598), (-0.097205283, -1.303741203))
            ThreePointArc((-0.097205283, -1.303741203), (-0.043344118, -0.652015244), (-0.025390397, 0.000698395))
            Line((-0.025390397, 0.000698395), (0.000698395, 0.025390397))
            ThreePointArc((0.000698395, 0.025390397), (0.653412034, 0.007436675), (1.307113353, 0.025390397))
            Line((1.307113353, 0.025390397), (1.306414958, 0))
        make_face()
    chamfer1_piece_16b = extrude(amount=140.426037395, mode=Mode.PRIVATE)
    chamfer1_piece_16b = split(chamfer1_piece_16b, bisect_by=Plane(origin=(-52.509062384, -68.58, 5.461731684), z_dir=(0, -1, 0)), keep=Keep.TOP, mode=Mode.PRIVATE)
    chamfer1_piece_16b = split(chamfer1_piece_16b, bisect_by=Plane(origin=(-52.509062384, -70.213018697, 4.826), z_dir=(0, 0, 1)), keep=Keep.TOP, mode=Mode.PRIVATE)
    chamfer1_piece_16 = chamfer1_piece_16a & chamfer1_piece_16b
    add(chamfer1_piece_16, mode=Mode.SUBTRACT)

    # Chamfer2: one chamfer whose edges measure the first distance from different faces: ONE call of the kernel's chamfer builder (chamfer() names one face for all edges)
    chamfer2_edges_1 = [part.edges().sort_by_distance(p)[0] for p in [
        (-56.634948889, 75.944445614, 2.921),
    ]]
    chamfer2_side_1 = [part.faces().sort_by_distance(p)[0] for p in [
        (0, 75.945220304, 2.912145254),
    ]]
    chamfer2_edges_2 = [part.edges().sort_by_distance(p)[0] for p in [
        (56.634948889, 75.944445614, 2.921),
    ]]
    chamfer2_side_2 = [part.faces().sort_by_distance(p)[0] for p in [
        (56.635526608, 0, 2.917723595),
    ]]
    chamfer2_edges_3 = [part.edges().sort_by_distance(p)[0] for p in [
        (56.634948889, -75.944445614, 2.921),
    ]]
    chamfer2_side_3 = [part.faces().sort_by_distance(p)[0] for p in [
        (0, -75.945220304, 2.912145254),
    ]]
    chamfer2_edges_4 = [part.edges().sort_by_distance(p)[0] for p in [
        (-56.634948889, -75.944445614, 2.921),
    ]]
    chamfer2_side_4 = [part.faces().sort_by_distance(p)[0] for p in [
        (-56.635526608, 0, 2.917723595),
    ]]
    chamfer2 = BRepFilletAPI_MakeChamfer(part.part.solid().wrapped)
    for e in chamfer2_edges_1:
        chamfer2.Add(CHAMFER2_SIZE, CHAMFER2_SIZE2, e.wrapped, chamfer2_side_1[0].wrapped)  # the first distance lies on this face
    for e in chamfer2_edges_2:
        chamfer2.Add(CHAMFER2_SIZE, CHAMFER2_SIZE2, e.wrapped, chamfer2_side_2[0].wrapped)  # the first distance lies on this face
    for e in chamfer2_edges_3:
        chamfer2.Add(CHAMFER2_SIZE, CHAMFER2_SIZE2, e.wrapped, chamfer2_side_3[0].wrapped)  # the first distance lies on this face
    for e in chamfer2_edges_4:
        chamfer2.Add(CHAMFER2_SIZE, CHAMFER2_SIZE2, e.wrapped, chamfer2_side_4[0].wrapped)  # the first distance lies on this face
    add(Compound.cast(chamfer2.Shape()), mode=Mode.REPLACE)

    # Sketch3 → Cut-Extrude1 (cut)
    with BuildSketch(Plane.XY.offset(5.842)):
        with BuildLine():
            Line((15.875, 55.88), (-15.875, 55.88))
            ThreePointArc((-15.875, 55.88), (-19.05, 59.055), (-15.875, 62.23))
            Line((-15.875, 62.23), (15.875, 62.23))
            ThreePointArc((15.875, 62.23), (19.05, 59.055), (15.875, 55.88))
        make_face()
        with BuildLine():
            Line((15.875, 44.45), (-15.875, 44.45))
            ThreePointArc((-15.875, 44.45), (-19.05, 47.625), (-15.875, 50.8))
            Line((-15.875, 50.8), (15.875, 50.8))
            ThreePointArc((15.875, 50.8), (19.05, 47.625), (15.875, 44.45))
        make_face()
        with BuildLine():
            Line((15.875, 33.02), (-15.875, 33.02))
            ThreePointArc((-15.875, 33.02), (-19.05, 36.195), (-15.875, 39.37))
            Line((-15.875, 39.37), (15.875, 39.37))
            ThreePointArc((15.875, 39.37), (19.05, 36.195), (15.875, 33.02))
        make_face()
    extrude(amount=-CUT_EXTRUDE1_DEPTH, mode=Mode.SUBTRACT)


solid = part.part
